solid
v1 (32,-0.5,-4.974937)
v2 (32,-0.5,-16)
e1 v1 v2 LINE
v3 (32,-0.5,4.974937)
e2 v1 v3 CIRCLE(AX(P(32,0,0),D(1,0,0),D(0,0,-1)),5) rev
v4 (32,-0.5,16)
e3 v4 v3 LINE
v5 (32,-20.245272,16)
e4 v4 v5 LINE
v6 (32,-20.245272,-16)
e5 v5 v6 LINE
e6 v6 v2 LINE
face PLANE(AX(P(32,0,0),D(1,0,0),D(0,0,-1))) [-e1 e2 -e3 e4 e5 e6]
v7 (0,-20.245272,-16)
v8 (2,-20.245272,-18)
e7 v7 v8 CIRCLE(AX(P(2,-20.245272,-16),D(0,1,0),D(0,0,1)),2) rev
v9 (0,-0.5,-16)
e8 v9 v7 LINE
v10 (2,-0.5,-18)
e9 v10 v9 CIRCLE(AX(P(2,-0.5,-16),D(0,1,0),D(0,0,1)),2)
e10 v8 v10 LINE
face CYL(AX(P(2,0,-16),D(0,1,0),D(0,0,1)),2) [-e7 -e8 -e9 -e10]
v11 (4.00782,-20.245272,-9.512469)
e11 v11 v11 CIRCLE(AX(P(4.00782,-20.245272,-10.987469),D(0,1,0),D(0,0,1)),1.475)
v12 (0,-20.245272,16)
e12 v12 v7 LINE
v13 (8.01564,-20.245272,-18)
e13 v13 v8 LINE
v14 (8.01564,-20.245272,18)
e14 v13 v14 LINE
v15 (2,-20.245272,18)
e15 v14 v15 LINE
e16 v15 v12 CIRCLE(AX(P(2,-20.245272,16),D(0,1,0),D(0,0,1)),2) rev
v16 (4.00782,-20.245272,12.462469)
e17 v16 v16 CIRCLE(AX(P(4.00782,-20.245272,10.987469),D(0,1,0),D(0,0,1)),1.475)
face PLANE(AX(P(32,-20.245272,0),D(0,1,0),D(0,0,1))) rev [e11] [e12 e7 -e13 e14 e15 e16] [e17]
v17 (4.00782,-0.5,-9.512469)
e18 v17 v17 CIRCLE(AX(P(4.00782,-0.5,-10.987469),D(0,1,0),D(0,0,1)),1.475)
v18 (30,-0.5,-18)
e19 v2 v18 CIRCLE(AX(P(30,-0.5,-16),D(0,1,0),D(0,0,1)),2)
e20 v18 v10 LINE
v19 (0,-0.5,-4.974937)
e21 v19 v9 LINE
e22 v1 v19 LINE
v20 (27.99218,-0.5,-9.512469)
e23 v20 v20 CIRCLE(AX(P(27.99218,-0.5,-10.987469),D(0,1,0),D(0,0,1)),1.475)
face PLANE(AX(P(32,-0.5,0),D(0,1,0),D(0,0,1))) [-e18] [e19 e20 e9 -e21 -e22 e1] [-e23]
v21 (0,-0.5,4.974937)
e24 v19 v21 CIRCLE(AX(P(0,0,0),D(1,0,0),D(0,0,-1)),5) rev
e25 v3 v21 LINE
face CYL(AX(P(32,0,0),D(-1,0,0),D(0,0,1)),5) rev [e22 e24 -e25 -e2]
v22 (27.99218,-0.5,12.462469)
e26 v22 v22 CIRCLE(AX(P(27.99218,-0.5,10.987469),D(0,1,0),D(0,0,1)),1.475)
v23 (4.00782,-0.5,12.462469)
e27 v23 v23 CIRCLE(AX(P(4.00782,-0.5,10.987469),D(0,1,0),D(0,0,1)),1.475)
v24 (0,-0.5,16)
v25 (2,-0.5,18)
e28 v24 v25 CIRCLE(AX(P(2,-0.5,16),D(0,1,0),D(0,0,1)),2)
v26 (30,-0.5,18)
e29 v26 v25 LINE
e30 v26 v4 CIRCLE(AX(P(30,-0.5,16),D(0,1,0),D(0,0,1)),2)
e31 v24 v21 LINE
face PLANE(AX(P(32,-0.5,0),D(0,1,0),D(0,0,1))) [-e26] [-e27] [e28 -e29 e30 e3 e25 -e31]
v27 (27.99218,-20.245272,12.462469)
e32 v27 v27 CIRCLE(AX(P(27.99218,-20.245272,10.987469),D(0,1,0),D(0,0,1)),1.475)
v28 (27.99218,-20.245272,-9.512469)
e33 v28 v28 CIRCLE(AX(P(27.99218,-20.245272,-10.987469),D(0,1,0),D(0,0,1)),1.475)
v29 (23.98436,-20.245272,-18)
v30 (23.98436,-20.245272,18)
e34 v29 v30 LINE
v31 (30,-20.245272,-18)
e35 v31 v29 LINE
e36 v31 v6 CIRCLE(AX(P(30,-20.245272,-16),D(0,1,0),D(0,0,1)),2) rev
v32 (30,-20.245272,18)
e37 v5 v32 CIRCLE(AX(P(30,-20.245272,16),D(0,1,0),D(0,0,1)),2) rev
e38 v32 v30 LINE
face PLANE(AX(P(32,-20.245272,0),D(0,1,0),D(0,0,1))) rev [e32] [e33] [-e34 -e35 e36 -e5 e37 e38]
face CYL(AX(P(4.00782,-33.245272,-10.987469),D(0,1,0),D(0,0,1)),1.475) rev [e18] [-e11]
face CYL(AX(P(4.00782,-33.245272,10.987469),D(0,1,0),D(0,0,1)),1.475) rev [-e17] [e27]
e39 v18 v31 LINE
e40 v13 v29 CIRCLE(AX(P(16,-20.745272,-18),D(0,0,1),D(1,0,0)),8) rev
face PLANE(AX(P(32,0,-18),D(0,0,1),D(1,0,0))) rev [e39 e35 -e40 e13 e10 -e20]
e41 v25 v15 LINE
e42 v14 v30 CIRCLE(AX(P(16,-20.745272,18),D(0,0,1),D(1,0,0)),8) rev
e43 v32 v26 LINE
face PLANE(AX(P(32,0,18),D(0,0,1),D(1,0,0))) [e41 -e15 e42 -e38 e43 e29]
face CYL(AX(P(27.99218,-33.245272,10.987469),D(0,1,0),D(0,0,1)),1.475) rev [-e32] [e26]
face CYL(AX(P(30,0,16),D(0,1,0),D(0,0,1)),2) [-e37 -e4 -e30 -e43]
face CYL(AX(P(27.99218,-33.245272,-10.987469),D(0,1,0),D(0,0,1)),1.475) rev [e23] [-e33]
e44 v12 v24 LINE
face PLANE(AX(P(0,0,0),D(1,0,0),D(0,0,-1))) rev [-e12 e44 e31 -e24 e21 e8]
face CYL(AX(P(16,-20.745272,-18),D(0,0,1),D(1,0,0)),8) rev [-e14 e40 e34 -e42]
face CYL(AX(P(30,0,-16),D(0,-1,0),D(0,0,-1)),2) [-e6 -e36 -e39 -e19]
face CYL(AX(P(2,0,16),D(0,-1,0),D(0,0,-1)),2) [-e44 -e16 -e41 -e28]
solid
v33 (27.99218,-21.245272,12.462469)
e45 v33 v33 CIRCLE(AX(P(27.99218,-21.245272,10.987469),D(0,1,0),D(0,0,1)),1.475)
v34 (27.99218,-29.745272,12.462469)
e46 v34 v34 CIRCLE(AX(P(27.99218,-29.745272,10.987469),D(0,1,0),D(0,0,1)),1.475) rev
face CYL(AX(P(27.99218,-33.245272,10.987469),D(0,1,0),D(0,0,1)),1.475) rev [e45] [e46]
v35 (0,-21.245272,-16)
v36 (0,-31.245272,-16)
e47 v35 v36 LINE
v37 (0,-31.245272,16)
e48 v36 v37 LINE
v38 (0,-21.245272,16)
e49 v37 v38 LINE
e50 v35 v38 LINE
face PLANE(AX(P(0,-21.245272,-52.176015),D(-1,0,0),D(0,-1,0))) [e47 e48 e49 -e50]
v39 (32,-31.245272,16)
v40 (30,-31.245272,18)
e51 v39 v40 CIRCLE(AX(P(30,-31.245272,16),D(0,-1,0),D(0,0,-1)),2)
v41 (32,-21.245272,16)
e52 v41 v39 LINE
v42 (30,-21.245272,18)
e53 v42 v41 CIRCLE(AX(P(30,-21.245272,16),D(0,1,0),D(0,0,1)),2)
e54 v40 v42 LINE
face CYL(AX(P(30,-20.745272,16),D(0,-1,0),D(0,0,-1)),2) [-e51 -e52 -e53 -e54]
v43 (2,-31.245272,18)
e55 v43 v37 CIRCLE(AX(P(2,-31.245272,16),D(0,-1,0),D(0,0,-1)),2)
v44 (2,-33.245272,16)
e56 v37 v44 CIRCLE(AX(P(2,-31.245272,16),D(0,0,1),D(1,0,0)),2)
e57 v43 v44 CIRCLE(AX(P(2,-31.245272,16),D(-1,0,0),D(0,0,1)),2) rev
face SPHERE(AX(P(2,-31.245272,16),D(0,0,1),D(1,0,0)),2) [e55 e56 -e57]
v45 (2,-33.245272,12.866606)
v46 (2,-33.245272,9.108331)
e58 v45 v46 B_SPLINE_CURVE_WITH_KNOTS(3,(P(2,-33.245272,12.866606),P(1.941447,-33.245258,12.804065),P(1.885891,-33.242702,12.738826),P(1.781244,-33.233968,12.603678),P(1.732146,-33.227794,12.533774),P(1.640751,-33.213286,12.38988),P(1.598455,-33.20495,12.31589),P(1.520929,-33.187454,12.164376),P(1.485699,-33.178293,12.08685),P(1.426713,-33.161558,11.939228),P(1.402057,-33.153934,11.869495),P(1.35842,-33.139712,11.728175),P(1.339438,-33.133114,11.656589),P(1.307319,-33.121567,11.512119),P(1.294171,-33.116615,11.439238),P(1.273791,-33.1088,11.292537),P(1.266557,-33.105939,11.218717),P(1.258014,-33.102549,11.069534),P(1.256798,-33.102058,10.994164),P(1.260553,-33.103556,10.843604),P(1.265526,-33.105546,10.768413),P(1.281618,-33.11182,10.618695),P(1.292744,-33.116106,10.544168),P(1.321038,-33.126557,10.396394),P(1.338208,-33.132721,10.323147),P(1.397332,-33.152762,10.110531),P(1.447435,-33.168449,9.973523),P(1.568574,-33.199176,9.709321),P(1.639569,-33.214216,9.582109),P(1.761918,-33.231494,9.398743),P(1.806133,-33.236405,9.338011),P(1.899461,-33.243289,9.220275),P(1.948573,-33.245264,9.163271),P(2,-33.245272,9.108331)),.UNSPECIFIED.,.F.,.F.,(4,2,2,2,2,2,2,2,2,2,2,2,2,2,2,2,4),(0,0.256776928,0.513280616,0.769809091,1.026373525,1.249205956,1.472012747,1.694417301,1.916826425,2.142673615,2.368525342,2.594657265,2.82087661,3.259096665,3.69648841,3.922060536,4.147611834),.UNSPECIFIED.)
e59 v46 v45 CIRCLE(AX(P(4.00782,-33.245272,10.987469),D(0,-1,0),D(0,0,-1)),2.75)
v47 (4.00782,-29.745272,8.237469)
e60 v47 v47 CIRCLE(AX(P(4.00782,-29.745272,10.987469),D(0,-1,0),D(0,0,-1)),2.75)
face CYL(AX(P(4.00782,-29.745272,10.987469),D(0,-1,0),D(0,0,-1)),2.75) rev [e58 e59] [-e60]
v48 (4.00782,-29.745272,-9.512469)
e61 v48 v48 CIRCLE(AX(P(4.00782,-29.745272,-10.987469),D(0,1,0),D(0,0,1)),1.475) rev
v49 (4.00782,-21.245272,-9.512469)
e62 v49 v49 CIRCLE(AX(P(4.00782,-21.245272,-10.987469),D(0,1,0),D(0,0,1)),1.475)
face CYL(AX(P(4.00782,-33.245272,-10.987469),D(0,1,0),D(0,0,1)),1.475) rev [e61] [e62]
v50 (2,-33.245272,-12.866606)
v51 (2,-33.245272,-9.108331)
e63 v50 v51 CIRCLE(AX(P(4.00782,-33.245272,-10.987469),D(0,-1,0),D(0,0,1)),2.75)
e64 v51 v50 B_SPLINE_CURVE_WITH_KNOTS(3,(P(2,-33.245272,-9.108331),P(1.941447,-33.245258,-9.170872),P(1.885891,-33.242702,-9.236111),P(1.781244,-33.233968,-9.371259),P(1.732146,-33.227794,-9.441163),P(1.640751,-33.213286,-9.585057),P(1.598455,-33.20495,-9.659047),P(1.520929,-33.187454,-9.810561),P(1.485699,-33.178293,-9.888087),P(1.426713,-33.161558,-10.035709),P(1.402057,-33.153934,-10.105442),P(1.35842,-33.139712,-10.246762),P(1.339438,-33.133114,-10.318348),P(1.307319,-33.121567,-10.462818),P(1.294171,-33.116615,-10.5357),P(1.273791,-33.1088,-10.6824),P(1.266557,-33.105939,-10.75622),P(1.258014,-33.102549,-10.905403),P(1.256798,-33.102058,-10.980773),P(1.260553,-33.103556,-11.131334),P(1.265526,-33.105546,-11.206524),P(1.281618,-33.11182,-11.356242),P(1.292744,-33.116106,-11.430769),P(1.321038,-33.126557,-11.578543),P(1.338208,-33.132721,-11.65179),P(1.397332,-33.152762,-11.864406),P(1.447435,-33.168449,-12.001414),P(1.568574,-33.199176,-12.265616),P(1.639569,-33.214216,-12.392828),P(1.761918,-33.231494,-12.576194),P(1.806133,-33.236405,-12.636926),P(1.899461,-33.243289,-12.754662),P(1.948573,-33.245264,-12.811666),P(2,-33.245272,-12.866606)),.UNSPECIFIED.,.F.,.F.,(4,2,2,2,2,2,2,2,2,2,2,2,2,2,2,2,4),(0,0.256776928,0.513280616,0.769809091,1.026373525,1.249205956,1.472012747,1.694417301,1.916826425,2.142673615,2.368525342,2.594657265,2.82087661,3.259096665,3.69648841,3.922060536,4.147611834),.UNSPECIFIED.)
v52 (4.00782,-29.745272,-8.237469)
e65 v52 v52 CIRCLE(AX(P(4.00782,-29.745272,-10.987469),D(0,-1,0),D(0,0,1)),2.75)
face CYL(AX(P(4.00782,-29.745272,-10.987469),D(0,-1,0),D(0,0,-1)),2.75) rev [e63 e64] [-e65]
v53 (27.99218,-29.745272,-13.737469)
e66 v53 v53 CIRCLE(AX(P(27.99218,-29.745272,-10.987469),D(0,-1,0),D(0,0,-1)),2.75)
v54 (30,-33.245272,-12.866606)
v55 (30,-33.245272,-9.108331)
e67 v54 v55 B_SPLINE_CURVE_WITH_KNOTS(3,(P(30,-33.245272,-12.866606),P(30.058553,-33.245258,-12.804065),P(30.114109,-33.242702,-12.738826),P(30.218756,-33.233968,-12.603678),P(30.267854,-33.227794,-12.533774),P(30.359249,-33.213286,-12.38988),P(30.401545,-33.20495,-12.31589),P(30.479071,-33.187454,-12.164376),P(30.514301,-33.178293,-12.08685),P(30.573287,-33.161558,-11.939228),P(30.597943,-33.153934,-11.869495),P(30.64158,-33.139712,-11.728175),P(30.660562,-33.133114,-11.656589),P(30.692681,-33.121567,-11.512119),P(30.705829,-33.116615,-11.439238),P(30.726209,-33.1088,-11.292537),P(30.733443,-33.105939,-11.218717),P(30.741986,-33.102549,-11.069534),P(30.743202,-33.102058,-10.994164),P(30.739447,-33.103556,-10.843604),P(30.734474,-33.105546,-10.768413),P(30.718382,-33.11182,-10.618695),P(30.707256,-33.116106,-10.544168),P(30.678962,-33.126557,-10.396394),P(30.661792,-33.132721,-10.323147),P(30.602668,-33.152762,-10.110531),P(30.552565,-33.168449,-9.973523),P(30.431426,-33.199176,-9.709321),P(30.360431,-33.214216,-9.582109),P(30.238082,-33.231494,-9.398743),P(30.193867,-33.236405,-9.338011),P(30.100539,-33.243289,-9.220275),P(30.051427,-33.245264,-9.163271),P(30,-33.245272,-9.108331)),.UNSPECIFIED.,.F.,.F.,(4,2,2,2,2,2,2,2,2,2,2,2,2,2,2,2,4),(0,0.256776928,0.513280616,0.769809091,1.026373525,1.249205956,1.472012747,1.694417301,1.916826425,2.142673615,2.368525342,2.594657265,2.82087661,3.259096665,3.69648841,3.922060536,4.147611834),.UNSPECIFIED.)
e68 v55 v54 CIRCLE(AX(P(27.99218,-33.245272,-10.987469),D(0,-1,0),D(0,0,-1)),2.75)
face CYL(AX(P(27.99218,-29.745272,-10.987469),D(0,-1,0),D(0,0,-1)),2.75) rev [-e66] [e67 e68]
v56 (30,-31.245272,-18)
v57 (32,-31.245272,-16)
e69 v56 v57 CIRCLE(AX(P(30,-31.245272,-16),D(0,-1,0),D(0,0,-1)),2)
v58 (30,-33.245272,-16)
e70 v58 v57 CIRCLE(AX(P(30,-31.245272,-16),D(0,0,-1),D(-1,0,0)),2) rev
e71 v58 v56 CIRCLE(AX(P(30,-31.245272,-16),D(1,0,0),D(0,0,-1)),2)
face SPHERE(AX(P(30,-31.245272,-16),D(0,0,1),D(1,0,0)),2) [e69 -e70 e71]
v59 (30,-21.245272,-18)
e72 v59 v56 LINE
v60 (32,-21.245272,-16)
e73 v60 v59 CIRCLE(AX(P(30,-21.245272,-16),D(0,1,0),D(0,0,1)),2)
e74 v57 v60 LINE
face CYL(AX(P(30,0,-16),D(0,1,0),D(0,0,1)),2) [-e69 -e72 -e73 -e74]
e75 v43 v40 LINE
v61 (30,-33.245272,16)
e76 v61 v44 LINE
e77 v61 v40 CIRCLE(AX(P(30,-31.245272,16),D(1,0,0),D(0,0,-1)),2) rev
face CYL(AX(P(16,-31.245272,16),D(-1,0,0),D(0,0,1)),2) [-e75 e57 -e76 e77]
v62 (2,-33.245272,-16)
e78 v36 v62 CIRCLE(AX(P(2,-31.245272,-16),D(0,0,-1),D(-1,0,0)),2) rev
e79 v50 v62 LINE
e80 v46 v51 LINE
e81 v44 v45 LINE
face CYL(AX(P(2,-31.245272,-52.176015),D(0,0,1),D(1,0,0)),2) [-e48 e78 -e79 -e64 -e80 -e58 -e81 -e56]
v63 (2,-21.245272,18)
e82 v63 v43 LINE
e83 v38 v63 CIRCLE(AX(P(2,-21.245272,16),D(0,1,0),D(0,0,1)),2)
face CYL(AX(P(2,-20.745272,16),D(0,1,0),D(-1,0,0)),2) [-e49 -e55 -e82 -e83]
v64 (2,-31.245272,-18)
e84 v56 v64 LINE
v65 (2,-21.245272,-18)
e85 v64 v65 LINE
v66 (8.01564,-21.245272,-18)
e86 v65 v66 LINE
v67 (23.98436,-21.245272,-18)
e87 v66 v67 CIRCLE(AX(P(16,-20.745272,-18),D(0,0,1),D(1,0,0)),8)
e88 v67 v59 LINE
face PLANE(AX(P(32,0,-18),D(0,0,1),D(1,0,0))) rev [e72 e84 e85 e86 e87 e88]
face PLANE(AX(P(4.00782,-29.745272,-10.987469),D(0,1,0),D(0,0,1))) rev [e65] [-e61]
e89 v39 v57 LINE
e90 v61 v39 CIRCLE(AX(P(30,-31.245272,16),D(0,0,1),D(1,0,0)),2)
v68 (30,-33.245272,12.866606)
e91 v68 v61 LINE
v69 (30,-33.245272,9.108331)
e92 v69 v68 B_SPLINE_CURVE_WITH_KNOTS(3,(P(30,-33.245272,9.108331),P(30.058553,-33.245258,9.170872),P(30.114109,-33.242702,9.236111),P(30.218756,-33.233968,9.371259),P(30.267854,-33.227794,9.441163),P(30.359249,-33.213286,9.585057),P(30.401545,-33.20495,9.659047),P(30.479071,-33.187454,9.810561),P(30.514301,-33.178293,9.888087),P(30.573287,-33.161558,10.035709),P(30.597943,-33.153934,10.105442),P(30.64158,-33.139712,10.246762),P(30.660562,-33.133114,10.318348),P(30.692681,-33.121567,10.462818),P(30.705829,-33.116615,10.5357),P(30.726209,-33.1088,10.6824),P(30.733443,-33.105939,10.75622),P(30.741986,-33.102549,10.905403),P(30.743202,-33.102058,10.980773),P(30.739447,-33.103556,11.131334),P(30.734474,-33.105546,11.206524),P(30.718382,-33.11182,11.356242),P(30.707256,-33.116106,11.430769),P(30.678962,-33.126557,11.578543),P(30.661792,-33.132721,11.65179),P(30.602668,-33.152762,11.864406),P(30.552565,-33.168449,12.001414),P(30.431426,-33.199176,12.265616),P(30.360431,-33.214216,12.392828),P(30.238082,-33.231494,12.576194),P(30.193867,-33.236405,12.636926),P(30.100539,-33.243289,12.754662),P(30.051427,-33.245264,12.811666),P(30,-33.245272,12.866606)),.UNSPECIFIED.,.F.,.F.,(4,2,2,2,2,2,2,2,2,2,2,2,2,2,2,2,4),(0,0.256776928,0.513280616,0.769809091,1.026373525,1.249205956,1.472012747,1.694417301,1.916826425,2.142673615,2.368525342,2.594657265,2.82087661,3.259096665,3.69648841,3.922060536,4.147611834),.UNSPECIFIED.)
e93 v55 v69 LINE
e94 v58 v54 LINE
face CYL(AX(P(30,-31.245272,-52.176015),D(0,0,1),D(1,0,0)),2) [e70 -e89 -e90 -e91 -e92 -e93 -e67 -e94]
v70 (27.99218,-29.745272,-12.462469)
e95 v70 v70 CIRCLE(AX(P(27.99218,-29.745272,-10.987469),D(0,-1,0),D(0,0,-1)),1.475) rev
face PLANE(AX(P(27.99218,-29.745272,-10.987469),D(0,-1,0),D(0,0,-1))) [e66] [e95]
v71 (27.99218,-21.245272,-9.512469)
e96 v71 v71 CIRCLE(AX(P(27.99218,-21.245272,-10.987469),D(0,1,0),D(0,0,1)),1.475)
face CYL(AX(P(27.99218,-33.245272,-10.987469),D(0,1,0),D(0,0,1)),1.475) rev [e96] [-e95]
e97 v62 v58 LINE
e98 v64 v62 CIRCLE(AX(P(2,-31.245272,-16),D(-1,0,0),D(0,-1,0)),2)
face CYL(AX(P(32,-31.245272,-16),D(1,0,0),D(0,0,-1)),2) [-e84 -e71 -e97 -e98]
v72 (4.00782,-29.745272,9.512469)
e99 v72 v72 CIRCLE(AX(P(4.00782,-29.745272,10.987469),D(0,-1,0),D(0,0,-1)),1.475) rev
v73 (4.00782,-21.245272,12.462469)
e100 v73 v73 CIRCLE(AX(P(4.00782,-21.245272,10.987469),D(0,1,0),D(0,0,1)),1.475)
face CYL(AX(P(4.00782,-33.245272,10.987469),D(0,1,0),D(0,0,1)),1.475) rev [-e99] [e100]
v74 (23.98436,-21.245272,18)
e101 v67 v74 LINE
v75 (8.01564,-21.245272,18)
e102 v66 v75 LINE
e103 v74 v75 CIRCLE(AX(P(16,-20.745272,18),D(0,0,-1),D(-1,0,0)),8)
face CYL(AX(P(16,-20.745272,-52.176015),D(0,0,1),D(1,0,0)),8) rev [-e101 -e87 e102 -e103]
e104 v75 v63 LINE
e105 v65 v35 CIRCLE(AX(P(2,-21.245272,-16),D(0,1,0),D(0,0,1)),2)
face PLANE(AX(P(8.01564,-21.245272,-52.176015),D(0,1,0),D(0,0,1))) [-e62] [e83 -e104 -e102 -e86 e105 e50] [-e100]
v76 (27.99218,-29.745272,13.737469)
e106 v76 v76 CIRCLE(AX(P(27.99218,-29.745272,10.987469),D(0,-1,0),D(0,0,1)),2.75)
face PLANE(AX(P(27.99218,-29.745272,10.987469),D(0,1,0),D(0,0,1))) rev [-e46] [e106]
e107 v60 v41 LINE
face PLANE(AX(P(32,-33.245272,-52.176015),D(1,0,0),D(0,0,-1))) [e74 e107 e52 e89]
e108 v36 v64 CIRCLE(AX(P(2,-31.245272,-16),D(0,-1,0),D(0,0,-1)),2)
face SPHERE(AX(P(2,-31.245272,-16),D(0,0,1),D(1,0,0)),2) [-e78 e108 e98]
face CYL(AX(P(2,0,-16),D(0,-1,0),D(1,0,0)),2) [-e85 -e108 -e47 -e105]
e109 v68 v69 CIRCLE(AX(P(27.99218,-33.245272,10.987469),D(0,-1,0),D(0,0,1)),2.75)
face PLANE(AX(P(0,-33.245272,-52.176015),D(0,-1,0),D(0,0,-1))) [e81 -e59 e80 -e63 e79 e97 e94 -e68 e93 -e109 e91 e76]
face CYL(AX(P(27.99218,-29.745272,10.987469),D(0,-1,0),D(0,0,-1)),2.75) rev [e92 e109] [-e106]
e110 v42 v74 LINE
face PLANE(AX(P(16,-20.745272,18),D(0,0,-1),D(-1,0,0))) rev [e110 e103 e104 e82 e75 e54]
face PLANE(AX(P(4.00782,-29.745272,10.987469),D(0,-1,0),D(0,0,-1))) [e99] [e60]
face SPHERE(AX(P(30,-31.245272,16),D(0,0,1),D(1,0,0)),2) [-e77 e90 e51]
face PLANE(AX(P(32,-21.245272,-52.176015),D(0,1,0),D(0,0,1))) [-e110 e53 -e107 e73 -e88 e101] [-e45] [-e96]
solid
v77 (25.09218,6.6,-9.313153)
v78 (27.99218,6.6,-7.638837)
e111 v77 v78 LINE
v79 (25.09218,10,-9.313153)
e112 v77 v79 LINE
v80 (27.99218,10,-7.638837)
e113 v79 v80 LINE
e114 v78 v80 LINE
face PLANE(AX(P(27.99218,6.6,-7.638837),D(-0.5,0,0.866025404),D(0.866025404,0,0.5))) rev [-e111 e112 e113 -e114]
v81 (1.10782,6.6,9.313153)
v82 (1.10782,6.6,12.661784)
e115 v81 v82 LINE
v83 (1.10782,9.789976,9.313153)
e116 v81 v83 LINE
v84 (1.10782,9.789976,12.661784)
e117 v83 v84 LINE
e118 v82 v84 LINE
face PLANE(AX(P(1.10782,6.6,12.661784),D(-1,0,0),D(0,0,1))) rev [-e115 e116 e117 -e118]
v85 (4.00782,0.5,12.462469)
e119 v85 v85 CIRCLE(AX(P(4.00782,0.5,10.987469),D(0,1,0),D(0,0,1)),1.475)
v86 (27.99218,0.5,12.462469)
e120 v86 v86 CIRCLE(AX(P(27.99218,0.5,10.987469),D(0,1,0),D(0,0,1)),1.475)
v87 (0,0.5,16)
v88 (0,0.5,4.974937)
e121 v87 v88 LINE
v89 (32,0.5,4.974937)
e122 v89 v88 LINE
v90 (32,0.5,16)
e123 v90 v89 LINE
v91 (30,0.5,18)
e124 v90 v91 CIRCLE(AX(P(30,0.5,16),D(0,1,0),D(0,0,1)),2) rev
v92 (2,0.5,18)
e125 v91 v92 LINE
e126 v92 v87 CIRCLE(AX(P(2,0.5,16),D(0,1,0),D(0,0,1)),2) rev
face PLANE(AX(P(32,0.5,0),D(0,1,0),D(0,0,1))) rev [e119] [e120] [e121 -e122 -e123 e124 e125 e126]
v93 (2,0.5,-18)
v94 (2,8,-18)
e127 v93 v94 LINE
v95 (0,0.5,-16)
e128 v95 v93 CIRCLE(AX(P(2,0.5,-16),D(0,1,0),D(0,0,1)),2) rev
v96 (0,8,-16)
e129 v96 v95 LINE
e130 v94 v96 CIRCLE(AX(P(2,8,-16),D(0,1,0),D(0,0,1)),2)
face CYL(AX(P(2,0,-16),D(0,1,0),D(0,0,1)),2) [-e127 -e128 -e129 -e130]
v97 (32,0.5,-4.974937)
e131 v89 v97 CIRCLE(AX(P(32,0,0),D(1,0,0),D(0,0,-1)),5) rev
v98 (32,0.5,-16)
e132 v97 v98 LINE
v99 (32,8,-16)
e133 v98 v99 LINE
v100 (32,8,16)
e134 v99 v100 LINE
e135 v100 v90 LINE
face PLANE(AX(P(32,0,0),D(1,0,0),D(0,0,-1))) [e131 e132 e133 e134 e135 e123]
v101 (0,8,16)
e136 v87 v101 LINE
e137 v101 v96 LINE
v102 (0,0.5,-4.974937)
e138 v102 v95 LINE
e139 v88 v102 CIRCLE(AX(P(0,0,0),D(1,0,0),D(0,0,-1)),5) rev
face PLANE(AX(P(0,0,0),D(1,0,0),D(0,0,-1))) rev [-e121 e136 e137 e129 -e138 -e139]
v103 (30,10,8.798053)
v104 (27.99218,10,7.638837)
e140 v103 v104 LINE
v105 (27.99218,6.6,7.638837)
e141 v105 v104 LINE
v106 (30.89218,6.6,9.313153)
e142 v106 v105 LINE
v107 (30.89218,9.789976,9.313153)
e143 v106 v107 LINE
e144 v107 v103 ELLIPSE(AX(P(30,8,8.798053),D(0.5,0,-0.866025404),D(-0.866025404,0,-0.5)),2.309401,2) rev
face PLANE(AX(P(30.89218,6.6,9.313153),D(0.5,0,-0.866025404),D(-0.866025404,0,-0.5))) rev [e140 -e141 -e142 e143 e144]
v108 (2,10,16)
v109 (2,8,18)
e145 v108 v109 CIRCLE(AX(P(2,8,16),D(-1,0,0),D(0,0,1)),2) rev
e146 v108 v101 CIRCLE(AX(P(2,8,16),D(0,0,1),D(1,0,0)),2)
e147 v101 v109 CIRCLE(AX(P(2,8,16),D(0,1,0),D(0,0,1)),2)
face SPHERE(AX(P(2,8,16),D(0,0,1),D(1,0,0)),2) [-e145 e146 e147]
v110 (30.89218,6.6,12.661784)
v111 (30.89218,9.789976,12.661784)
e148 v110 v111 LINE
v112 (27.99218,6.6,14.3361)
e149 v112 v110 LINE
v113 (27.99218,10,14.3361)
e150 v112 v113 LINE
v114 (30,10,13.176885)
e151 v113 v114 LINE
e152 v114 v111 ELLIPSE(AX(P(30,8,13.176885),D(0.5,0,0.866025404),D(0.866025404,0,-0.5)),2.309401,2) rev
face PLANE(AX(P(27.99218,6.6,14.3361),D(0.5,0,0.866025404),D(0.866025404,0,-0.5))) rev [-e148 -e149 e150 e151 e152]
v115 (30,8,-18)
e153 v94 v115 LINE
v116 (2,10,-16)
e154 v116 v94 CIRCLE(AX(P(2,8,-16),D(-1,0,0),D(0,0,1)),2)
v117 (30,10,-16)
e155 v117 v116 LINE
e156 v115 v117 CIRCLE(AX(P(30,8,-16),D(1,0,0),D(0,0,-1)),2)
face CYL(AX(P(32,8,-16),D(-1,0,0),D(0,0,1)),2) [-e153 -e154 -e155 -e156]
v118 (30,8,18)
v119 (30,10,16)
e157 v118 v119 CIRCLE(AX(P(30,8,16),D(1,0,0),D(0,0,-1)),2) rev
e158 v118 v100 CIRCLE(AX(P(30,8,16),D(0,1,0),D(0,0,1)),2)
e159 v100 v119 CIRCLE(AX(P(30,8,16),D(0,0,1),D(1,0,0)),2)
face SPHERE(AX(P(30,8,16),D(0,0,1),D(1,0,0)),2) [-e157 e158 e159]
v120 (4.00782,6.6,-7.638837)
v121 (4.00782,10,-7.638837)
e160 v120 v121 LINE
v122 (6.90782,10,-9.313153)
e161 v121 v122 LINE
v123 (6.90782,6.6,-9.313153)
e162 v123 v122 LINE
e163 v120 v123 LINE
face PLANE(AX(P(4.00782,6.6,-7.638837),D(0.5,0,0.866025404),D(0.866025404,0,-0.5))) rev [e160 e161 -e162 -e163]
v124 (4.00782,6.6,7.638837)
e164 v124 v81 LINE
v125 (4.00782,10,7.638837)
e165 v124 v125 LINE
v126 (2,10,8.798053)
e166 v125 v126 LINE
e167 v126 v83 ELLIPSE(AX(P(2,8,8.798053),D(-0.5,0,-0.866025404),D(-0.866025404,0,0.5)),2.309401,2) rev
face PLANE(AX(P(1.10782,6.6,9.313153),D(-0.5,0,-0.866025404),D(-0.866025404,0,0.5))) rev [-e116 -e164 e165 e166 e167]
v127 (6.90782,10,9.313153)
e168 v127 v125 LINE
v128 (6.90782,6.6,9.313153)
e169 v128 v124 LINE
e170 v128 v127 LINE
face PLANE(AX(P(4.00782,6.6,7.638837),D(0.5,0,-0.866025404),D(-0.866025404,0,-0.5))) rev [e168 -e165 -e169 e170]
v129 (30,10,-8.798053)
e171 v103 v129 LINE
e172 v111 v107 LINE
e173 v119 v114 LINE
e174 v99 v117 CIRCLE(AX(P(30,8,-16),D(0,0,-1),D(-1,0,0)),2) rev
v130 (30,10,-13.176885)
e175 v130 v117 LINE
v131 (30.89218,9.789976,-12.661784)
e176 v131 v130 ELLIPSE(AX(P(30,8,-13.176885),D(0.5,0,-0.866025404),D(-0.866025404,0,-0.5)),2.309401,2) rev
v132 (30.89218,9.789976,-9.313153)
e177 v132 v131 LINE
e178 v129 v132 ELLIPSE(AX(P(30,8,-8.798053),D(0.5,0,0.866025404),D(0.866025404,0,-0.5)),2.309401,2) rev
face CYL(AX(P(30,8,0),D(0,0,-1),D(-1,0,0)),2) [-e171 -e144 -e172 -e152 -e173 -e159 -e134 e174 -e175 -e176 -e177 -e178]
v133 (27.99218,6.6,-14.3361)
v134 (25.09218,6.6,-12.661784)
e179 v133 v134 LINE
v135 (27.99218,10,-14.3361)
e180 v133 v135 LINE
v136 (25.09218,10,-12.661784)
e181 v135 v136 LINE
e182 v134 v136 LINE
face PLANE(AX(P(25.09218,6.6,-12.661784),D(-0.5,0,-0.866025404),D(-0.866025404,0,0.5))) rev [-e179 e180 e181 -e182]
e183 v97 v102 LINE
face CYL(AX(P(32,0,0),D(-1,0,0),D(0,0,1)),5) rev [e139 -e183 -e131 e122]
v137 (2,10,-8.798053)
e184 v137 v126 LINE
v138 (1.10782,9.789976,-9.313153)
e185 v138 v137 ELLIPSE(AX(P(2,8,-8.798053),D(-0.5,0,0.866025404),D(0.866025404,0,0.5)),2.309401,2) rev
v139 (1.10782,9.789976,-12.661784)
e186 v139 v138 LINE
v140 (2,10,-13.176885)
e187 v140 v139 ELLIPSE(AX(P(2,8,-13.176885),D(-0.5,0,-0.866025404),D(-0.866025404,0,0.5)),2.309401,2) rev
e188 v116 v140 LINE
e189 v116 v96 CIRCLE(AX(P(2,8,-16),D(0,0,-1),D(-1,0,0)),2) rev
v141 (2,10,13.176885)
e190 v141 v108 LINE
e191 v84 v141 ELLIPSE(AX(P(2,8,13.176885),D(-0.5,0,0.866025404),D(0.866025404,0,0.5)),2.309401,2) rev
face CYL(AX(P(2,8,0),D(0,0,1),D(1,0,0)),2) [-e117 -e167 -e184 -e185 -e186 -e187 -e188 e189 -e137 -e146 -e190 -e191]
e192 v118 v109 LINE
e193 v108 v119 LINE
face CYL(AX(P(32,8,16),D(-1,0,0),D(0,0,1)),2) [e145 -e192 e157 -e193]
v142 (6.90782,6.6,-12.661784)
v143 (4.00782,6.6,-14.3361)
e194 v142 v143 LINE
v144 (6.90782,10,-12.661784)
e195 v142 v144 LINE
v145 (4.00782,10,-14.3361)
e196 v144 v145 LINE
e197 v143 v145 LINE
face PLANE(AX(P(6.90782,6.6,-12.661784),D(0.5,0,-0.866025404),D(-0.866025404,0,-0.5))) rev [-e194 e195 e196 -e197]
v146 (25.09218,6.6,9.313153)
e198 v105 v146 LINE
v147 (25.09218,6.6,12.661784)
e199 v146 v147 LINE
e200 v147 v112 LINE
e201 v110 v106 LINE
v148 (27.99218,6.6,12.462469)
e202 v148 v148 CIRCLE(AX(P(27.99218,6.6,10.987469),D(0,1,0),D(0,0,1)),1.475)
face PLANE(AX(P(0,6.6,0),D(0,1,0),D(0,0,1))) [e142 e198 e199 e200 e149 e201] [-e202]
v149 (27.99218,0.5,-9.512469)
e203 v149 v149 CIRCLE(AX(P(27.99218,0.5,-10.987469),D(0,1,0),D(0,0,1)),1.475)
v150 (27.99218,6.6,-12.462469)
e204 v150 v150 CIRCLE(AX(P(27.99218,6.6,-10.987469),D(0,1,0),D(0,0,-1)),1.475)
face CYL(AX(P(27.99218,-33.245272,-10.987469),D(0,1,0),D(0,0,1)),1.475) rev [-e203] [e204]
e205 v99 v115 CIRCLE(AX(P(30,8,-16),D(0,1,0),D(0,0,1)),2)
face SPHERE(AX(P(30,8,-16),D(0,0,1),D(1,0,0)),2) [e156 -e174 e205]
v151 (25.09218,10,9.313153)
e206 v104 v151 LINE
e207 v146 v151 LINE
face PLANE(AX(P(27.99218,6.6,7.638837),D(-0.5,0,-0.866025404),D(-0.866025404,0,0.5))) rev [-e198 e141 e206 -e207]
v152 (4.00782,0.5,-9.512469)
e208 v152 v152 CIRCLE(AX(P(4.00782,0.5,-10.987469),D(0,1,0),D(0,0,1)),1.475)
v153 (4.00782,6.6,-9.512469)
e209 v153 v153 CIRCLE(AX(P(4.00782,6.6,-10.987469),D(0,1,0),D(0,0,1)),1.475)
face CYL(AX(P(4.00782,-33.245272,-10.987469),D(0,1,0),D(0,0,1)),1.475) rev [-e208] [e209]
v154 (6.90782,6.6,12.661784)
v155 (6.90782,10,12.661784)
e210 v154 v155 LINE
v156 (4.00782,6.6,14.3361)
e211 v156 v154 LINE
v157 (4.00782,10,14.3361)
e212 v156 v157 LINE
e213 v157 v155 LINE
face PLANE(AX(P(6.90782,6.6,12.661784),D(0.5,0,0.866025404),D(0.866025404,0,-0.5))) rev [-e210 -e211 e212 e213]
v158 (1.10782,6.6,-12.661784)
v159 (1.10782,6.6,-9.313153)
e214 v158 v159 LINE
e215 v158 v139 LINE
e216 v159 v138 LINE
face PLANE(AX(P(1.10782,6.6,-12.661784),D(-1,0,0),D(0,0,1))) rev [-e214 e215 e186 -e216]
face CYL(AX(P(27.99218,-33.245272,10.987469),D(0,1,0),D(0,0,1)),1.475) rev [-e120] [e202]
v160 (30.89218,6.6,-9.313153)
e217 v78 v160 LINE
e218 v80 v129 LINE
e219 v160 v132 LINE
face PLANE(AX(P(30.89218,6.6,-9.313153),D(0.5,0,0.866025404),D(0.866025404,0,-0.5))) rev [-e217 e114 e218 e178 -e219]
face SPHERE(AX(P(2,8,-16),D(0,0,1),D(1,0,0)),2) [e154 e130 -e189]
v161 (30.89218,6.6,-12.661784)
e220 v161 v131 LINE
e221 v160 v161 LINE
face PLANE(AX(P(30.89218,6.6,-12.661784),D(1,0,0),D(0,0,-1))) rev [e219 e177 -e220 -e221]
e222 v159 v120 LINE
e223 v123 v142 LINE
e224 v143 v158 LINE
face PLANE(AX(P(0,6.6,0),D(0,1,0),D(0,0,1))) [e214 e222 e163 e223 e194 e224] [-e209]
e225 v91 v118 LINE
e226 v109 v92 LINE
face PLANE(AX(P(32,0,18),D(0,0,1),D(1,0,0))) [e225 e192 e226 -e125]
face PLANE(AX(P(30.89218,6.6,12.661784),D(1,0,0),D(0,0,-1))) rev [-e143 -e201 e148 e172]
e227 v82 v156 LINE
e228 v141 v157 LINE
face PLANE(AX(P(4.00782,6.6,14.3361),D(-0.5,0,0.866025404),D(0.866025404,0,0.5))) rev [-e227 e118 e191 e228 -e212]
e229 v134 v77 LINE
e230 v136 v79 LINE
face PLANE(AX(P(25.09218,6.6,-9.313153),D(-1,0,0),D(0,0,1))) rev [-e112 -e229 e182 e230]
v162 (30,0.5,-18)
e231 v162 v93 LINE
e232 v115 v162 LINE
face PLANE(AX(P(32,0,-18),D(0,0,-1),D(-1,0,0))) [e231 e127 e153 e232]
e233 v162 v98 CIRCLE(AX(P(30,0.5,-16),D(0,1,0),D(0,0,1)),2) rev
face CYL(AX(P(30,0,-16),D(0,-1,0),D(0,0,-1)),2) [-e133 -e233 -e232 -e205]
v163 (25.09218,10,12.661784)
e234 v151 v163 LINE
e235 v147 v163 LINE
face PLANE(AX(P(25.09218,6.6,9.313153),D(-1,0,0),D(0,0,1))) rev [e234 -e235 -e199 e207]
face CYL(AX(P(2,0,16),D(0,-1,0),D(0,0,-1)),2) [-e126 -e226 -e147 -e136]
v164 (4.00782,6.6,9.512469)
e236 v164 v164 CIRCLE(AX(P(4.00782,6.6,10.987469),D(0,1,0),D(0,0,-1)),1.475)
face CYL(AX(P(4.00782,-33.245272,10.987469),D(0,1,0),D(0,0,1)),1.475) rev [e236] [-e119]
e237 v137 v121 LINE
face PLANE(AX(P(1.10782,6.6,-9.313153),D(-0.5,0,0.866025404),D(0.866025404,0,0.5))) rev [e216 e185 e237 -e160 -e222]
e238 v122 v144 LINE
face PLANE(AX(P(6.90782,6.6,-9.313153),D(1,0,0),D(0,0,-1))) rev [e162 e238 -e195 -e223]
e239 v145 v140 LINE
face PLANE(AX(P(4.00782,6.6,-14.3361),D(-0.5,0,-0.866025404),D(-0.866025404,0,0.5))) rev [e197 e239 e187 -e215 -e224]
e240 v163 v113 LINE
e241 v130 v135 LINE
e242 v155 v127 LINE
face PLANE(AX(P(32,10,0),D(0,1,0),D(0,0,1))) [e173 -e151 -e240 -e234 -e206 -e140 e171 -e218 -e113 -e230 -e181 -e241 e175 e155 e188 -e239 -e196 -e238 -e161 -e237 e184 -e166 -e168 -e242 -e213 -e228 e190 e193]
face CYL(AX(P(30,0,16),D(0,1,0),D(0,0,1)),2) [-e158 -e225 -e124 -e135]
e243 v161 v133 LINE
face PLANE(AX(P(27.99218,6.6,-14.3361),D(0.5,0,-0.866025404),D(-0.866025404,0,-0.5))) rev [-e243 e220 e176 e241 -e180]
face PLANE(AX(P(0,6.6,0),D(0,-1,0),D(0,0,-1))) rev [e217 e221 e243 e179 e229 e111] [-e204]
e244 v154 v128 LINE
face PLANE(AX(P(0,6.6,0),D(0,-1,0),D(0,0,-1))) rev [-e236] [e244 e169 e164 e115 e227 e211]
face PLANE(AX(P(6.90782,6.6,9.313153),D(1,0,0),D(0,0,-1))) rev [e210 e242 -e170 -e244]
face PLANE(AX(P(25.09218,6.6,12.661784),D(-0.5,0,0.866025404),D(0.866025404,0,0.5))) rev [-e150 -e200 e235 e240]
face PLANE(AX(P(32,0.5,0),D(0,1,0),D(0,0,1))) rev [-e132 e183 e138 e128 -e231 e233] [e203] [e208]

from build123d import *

# Parameters (mm, degrees)
BOSS_EXTRUDE1_DEPTH     = 32
BOSS_EXTRUDE1_2_DEPTH   = 32
CUT_EXTRUDE3_DEPTH      = 53.24816764
BOSS_EXTRUDE2_DEPTH     = 36
CUT_EXTRUDE4_DEPTH      = 49.210652315
CUT_EXTRUDE4_DEPTH_BACK = 49.210652315
SKETCH5_R               = 1.475
CUT_EXTRUDE5_START      = -3.4
SKETCH7_R               = 1.475
CUT_EXTRUDE5_DEPTH      = 3.4
SKETCH8_R               = 2.75
CUT_EXTRUDE6_DEPTH      = 3.5
FILLET1_R               = 2
FILLET2_R               = 2
FILLET3_R               = 2


with BuildPart() as part:
    # Sketch1 → Boss-Extrude1 (new body)
    with BuildSketch(Plane(origin=(0, 0, 0), x_dir=(0, 0, -1), z_dir=(1, 0, 0))):
        with BuildLine():
            Line((-18, 10), (-18, 0.5))
            Line((-18, 0.5), (-4.974937186, 0.5))
            ThreePointArc((-4.974937186, 0.5), (0, 5), (4.974937186, 0.5))
            Line((4.974937186, 0.5), (18, 0.5))
            Line((18, 0.5), (18, 10))
            Line((18, 10), (-18, 10))
        make_face()
    extrude(amount=BOSS_EXTRUDE1_DEPTH)


with BuildPart() as body_2:
    # Sketch1 → Boss-Extrude1 2 (new body)
    with BuildSketch(Plane(origin=(0, 0, 0), x_dir=(0, 0, -1), z_dir=(1, 0, 0))):
        with BuildLine():
            Line((-18, -0.5), (-18, -10))
            Line((-18, -10), (-18, -20.245271588))
            Line((-18, -20.245271588), (18, -20.245271588))
            Line((18, -20.245271588), (18, -10))
            Line((18, -10), (18, -0.5))
            Line((18, -0.5), (4.974937186, -0.5))
            ThreePointArc((4.974937186, -0.5), (0, -5), (-4.974937186, -0.5))
            Line((-4.974937186, -0.5), (-18, -0.5))
        make_face()
    extrude(amount=BOSS_EXTRUDE1_2_DEPTH)

    # Sketch2 → Cut-Extrude3 (cut, through all)
    with BuildSketch(Plane.XY.offset(18)):
        with BuildLine():
            ThreePointArc((23.984359711, -20.245271588), (16, -12.745271588), (8.015640289, -20.245271588))
            Line((8.015640289, -20.245271588), (23.984359711, -20.245271588))
        make_face()
    extrude(amount=-CUT_EXTRUDE3_DEPTH, mode=Mode.SUBTRACT)


with BuildPart() as body_3:
    # Sketch3 → Boss-Extrude2 (new body)
    with BuildSketch(Plane.XY.offset(18)):
        with BuildLine():
            Line((32, -21.245271588), (23.984359711, -21.245271588))
            ThreePointArc((23.984359711, -21.245271588), (16, -28.745271588), (8.015640289, -21.245271588))
            Line((8.015640289, -21.245271588), (0, -21.245271588))
            Line((0, -21.245271588), (0, -33.245271588))
            Line((0, -33.245271588), (32, -33.245271588))
            Line((32, -33.245271588), (32, -21.245271588))
        make_face()
    extrude(amount=-BOSS_EXTRUDE2_DEPTH)


with BuildPart() as cut_extrude4_tool:
    # Sketch5 → Cut-Extrude4 (new, two sides: drawn at the far end of the back side and taken through both)
    with BuildSketch(Plane(origin=(0, -21.245271588, 0), x_dir=(1, 0, 0), z_dir=(0, 1, 0)).offset(-CUT_EXTRUDE4_DEPTH_BACK)):
        with Locations(Location((4.007820144, 10.987468593, 0), (0, 0, 270))):
            Circle(SKETCH5_R)
        with Locations(Location((27.992179856, 10.987468593, 0), (0, 0, 270))):
            Circle(SKETCH5_R)
        with Locations(Location((27.992179856, -10.987468593, 0), (0, 0, 270))):
            Circle(SKETCH5_R)
        with Locations(Location((4.007820144, -10.987468593, 0), (0, 0, 270))):
            Circle(SKETCH5_R)
    extrude(amount=CUT_EXTRUDE4_DEPTH + CUT_EXTRUDE4_DEPTH_BACK)


with BuildPart() as part_1:
    add(part.part)

    # Cut-Extrude4: cut by cut_extrude4_tool
    add(cut_extrude4_tool.part, mode=Mode.SUBTRACT)

    # Sketch7 → Cut-Extrude5 (cut)
    # profile 1 of 4: a face of its own
    with BuildSketch(Plane(origin=(0, 10, 0), x_dir=(1, 0, 0), z_dir=(0, 1, 0)).offset(CUT_EXTRUDE5_START)):
        Polygon((6.907820144, 9.313152812), (6.907820144, 12.661784373), (4.007820144, 14.336100154), (1.107820144, 12.661784373), (1.107820144, 9.313152812), (4.007820144, 7.638837031), align=None)
        with Locations(Location((4.007820144, 10.987468593, 0), (0, 0, 270))):
            Circle(SKETCH7_R, mode=Mode.SUBTRACT)
    # profile 2 of 4: a face of its own
    with BuildSketch(Plane(origin=(0, 10, 0), x_dir=(1, 0, 0), z_dir=(0, 1, 0)).offset(CUT_EXTRUDE5_START)):
        Polygon((27.992179856, 7.638837031), (25.092179856, 9.313152812), (25.092179856, 12.661784373), (27.992179856, 14.336100154), (30.892179856, 12.661784373), (30.892179856, 9.313152812), align=None)
        with Locations(Location((27.992179856, 10.987468593, 0), (0, 0, 270))):
            Circle(SKETCH7_R, mode=Mode.SUBTRACT)
    # profile 3 of 4: a face of its own
    with BuildSketch(Plane(origin=(0, 10, 0), x_dir=(1, 0, 0), z_dir=(0, 1, 0)).offset(CUT_EXTRUDE5_START)):
        Polygon((25.092179856, -9.313152812), (25.092179856, -12.661784373), (27.992179856, -14.336100154), (30.892179856, -12.661784373), (30.892179856, -9.313152812), (27.992179856, -7.638837031), align=None)
        with Locations(Location((27.992179856, -10.987468593, 0), (0, 0, 270))):
            Circle(SKETCH7_R, mode=Mode.SUBTRACT)
    # profile 4 of 4: a face of its own
    with BuildSketch(Plane(origin=(0, 10, 0), x_dir=(1, 0, 0), z_dir=(0, 1, 0)).offset(CUT_EXTRUDE5_START)):
        Polygon((4.007820144, -7.638837031), (6.907820144, -9.313152812), (6.907820144, -12.661784373), (4.007820144, -14.336100154), (1.107820144, -12.661784373), (1.107820144, -9.313152812), align=None)
        with Locations(Location((4.007820144, -10.987468593, 0), (0, 0, 270))):
            Circle(SKETCH7_R, mode=Mode.SUBTRACT)
    extrude(amount=CUT_EXTRUDE5_DEPTH, mode=Mode.SUBTRACT)

    # Fillet1
    # the kernel refuses this fillet: 2 mm, written as the material it takes off along each edge
    with BuildSketch(Plane(origin=(2, 8, 16), x_dir=(0, 1, 0), z_dir=(0, 0, 1))) as fillet1_piece_1_section:
        Polygon((0, 0), (FILLET1_R, 0), (FILLET1_R, FILLET1_R), (0, FILLET1_R), align=None)
    fillet1_piece_1 = extrude(amount=FILLET1_R, mode=Mode.PRIVATE)
    fillet1_piece_1 = fillet1_piece_1 - Plane(origin=(2, 8, 16), x_dir=(0.7071067811865475, -0.7071067811865475, 0), z_dir=(0, 0, 1)) * Sphere(FILLET1_R, mode=Mode.PRIVATE)
    add(fillet1_piece_1, mode=Mode.SUBTRACT)
    with BuildSketch(Plane(origin=(30, 8, 16), x_dir=(0, 1, 0), z_dir=(0, 0, 1))) as fillet1_piece_2_section:
        Polygon((0, 0), (FILLET1_R, 0), (FILLET1_R, -FILLET1_R), (0, -FILLET1_R), align=None)
    fillet1_piece_2 = extrude(amount=FILLET1_R, mode=Mode.PRIVATE)
    fillet1_piece_2 = fillet1_piece_2 - Plane(origin=(30, 8, 16), x_dir=(-0.7071067811865475, -0.7071067811865475, 0), z_dir=(0, 0, 1)) * Sphere(FILLET1_R, mode=Mode.PRIVATE)
    add(fillet1_piece_2, mode=Mode.SUBTRACT)
    with BuildSketch(Plane(origin=(2, 8, -16), x_dir=(-1, 0, 0), z_dir=(0, 1, 0))) as fillet1_piece_3_section:
        Polygon((0, 0), (FILLET1_R, 0), (FILLET1_R, -FILLET1_R), (0, -FILLET1_R), align=None)
    fillet1_piece_3 = extrude(amount=FILLET1_R, mode=Mode.PRIVATE)
    fillet1_piece_3 = fillet1_piece_3 - Plane(origin=(2, 8, -16), x_dir=(0.7071067811865475, 0, 0.7071067811865475), z_dir=(0, 1, 0)) * Sphere(FILLET1_R, mode=Mode.PRIVATE)
    add(fillet1_piece_3, mode=Mode.SUBTRACT)
    with BuildSketch(Plane(origin=(30, 8, -16), x_dir=(1, 0, 0), z_dir=(0, 1, 0))) as fillet1_piece_4_section:
        Polygon((0, 0), (FILLET1_R, 0), (FILLET1_R, FILLET1_R), (0, FILLET1_R), align=None)
    fillet1_piece_4 = extrude(amount=FILLET1_R, mode=Mode.PRIVATE)
    fillet1_piece_4 = fillet1_piece_4 - Plane(origin=(30, 8, -16), x_dir=(-0.7071067811865475, 0, 0.7071067811865475), z_dir=(0, 1, 0)) * Sphere(FILLET1_R, mode=Mode.PRIVATE)
    add(fillet1_piece_4, mode=Mode.SUBTRACT)
    with BuildSketch(Plane(origin=(2, 10, 18), x_dir=(0, -1, 0), z_dir=(1, 0, 0)), Plane(origin=(2, 10, -18), x_dir=(0, 0, 1), z_dir=(1, 0, 0))) as fillet1_piece_5:
        with BuildLine():
            CenterArc((FILLET1_R, FILLET1_R), FILLET1_R, 180, 90)
            Line((0, FILLET1_R), (0, 0))
            Line((0, 0), (FILLET1_R, 0))
        make_face()
    extrude(amount=28, mode=Mode.SUBTRACT)
    with BuildSketch(Plane(origin=(0, 10, -16), x_dir=(1, 0, 0), z_dir=(0, 0, 1))) as fillet1_piece_6:
        with BuildLine():
            CenterArc((FILLET1_R, -FILLET1_R), FILLET1_R, 90, 90)
            Line((0, -FILLET1_R), (0, 0))
            Line((0, 0), (FILLET1_R, 0))
        make_face()
    extrude(amount=32, mode=Mode.SUBTRACT)
    with BuildSketch(Plane(origin=(32, 10, -16), x_dir=(-1, 0, 0), z_dir=(0, 0, 1))) as fillet1_piece_7:
        with BuildLine():
            CenterArc((FILLET1_R, FILLET1_R), FILLET1_R, 180, 90)
            Line((0, FILLET1_R), (0, 0))
            Line((0, 0), (FILLET1_R, 0))
        make_face()
    extrude(amount=32, mode=Mode.SUBTRACT)
    with BuildSketch(Plane(origin=(0, -4.5, -18), x_dir=(0, 0, 1), z_dir=(0, 1, 0)), Plane(origin=(32, 8, 18), x_dir=(-1, 0, 0), z_dir=(0, -1, 0))) as fillet1_piece_8:
        with BuildLine():
            CenterArc((FILLET1_R, FILLET1_R), FILLET1_R, 180, 90)
            Line((0, FILLET1_R), (0, 0))
            Line((0, 0), (FILLET1_R, 0))
        make_face()
    extrude(amount=12.5, mode=Mode.SUBTRACT)
    with BuildSketch(Plane(origin=(0, 8, 18), x_dir=(1, 0, 0), z_dir=(0, -1, 0)), Plane(origin=(32, -4.5, -18), x_dir=(0, 0, 1), z_dir=(0, 1, 0))) as fillet1_piece_9:
        with BuildLine():
            CenterArc((FILLET1_R, -FILLET1_R), FILLET1_R, 90, 90)
            Line((0, -FILLET1_R), (0, 0))
            Line((0, 0), (FILLET1_R, 0))
        make_face()
    extrude(amount=12.5, mode=Mode.SUBTRACT)


with BuildPart() as body_2_1:
    add(body_2.part)

    # Cut-Extrude4: cut by cut_extrude4_tool
    add(cut_extrude4_tool.part, mode=Mode.SUBTRACT)

    # Fillet2
    fillet2_edges = [body_2_1.edges().sort_by_distance(p)[0] for p in [
        (32, -10.372635794, 18),
        (32, -10.372635794, -18),
        (0, -10.372635794, -18),
        (0, -10.372635794, 18),
    ]]
    fillet(fillet2_edges, radius=FILLET2_R)


with BuildPart() as body_3_1:
    add(body_3.part)

    # Cut-Extrude4: cut by cut_extrude4_tool
    add(cut_extrude4_tool.part, mode=Mode.SUBTRACT)

    # Sketch8 → Cut-Extrude6 (cut)
    with BuildSketch(Plane(origin=(0, -33.245271588, 0), x_dir=(-1, 0, 0), z_dir=(0, -1, 0))):
        with Locations(Location((-27.992179856, 10.987468593, 0), (0, 0, 90))):
            Circle(SKETCH8_R)
        with Locations(Location((-4.007820144, 10.987468593, 0), (0, 0, 270))):
            Circle(SKETCH8_R)
        with Locations(Location((-4.007820144, -10.987468593, 0), (0, 0, 90))):
            Circle(SKETCH8_R)
        with Locations(Location((-27.992179856, -10.987468593, 0), (0, 0, 270))):
            Circle(SKETCH8_R)
    extrude(amount=-CUT_EXTRUDE6_DEPTH, mode=Mode.SUBTRACT)

    # Fillet3
    # the kernel refuses this fillet: 2 mm, written as the material it takes off along each edge
    with BuildSketch(Plane(origin=(2, -31.245271588, 16), x_dir=(0, 0, 1), z_dir=(-1, 0, 0))) as fillet3_piece_1_section:
        Polygon((0, 0), (FILLET3_R, 0), (FILLET3_R, -FILLET3_R), (0, -FILLET3_R), align=None)
    fillet3_piece_1 = extrude(amount=FILLET3_R, mode=Mode.PRIVATE)
    fillet3_piece_1 = fillet3_piece_1 - Plane(origin=(2, -31.245271588, 16), x_dir=(0, 0.7071067811865475, -0.7071067811865475), z_dir=(-1, 0, 0)) * Sphere(FILLET3_R, mode=Mode.PRIVATE)
    add(fillet3_piece_1, mode=Mode.SUBTRACT)
    with BuildSketch(Plane(origin=(2, -31.245271588, -16), x_dir=(0, 0, -1), z_dir=(-1, 0, 0))) as fillet3_piece_2_section:
        Polygon((0, 0), (FILLET3_R, 0), (FILLET3_R, FILLET3_R), (0, FILLET3_R), align=None)
    fillet3_piece_2 = extrude(amount=FILLET3_R, mode=Mode.PRIVATE)
    fillet3_piece_2 = fillet3_piece_2 - Plane(origin=(2, -31.245271588, -16), x_dir=(0, 0.7071067811865475, 0.7071067811865475), z_dir=(-1, 0, 0)) * Sphere(FILLET3_R, mode=Mode.PRIVATE)
    add(fillet3_piece_2, mode=Mode.SUBTRACT)
    with BuildSketch(Plane(origin=(30, -31.245271588, 16), x_dir=(0, 0, 1), z_dir=(1, 0, 0))) as fillet3_piece_3_section:
        Polygon((0, 0), (FILLET3_R, 0), (FILLET3_R, FILLET3_R), (0, FILLET3_R), align=None)
    fillet3_piece_3 = extrude(amount=FILLET3_R, mode=Mode.PRIVATE)
    fillet3_piece_3 = fillet3_piece_3 - Plane(origin=(30, -31.245271588, 16), x_dir=(0, 0.7071067811865475, -0.7071067811865475), z_dir=(1, 0, 0)) * Sphere(FILLET3_R, mode=Mode.PRIVATE)
    add(fillet3_piece_3, mode=Mode.SUBTRACT)
    with BuildSketch(Plane(origin=(30, -31.245271588, -16), x_dir=(0, 0, -1), z_dir=(1, 0, 0))) as fillet3_piece_4_section:
        Polygon((0, 0), (FILLET3_R, 0), (FILLET3_R, -FILLET3_R), (0, -FILLET3_R), align=None)
    fillet3_piece_4 = extrude(amount=FILLET3_R, mode=Mode.PRIVATE)
    fillet3_piece_4 = fillet3_piece_4 - Plane(origin=(30, -31.245271588, -16), x_dir=(0, 0.7071067811865475, 0.7071067811865475), z_dir=(1, 0, 0)) * Sphere(FILLET3_R, mode=Mode.PRIVATE)
    add(fillet3_piece_4, mode=Mode.SUBTRACT)
    with BuildSketch(Plane(origin=(0, -33.245271588, 16), x_dir=(1, 0, 0), z_dir=(0, 0, -1)), Plane(origin=(32, -33.245271588, 16), x_dir=(0, 1, 0), z_dir=(0, 0, -1))) as fillet3_piece_5:
        with BuildLine():
            CenterArc((FILLET3_R, -FILLET3_R), FILLET3_R, 90, 90)
            Line((0, -FILLET3_R), (0, 0))
            Line((0, 0), (FILLET3_R, 0))
        make_face()
    extrude(amount=32, mode=Mode.SUBTRACT)
    with BuildSketch(Plane(origin=(2, -33.245271588, -18), x_dir=(0, 1, 0), z_dir=(1, 0, 0))) as fillet3_piece_6:
        with BuildLine():
            CenterArc((FILLET3_R, FILLET3_R), FILLET3_R, 180, 90)
            Line((0, FILLET3_R), (0, 0))
            Line((0, 0), (FILLET3_R, 0))
        make_face()
    extrude(amount=28, mode=Mode.SUBTRACT)
    with BuildSketch(Plane(origin=(32, -31.245271588, -18), x_dir=(0, 0, 1), z_dir=(0, 1, 0)), Plane(origin=(0, -16.245271588, 18), x_dir=(1, 0, 0), z_dir=(0, -1, 0))) as fillet3_piece_7:
        with BuildLine():
            CenterArc((FILLET3_R, -FILLET3_R), FILLET3_R, 90, 90)
            Line((0, -FILLET3_R), (0, 0))
            Line((0, 0), (FILLET3_R, 0))
        make_face()
    extrude(amount=15, mode=Mode.SUBTRACT)
    with BuildSketch(Plane(origin=(0, -16.245271588, -18), x_dir=(1, 0, 0), z_dir=(0, -1, 0)), Plane(origin=(32, -31.245271588, 18), x_dir=(0, 0, -1), z_dir=(0, 1, 0))) as fillet3_piece_8:
        with BuildLine():
            CenterArc((FILLET3_R, FILLET3_R), FILLET3_R, 180, 90)
            Line((0, FILLET3_R), (0, 0))
            Line((0, 0), (FILLET3_R, 0))
        make_face()
    extrude(amount=15, mode=Mode.SUBTRACT)
    with BuildSketch(Plane(origin=(2, -33.245271588, 18), x_dir=(0, 1, 0), z_dir=(1, 0, 0))) as fillet3_piece_9:
        with BuildLine():
            CenterArc((FILLET3_R, -FILLET3_R), FILLET3_R, 90, 90)
            Line((0, -FILLET3_R), (0, 0))
            Line((0, 0), (FILLET3_R, 0))
        make_face()
    extrude(amount=28, mode=Mode.SUBTRACT)


solid = Compound([part_1.part, body_2_1.part, body_3_1.part])
